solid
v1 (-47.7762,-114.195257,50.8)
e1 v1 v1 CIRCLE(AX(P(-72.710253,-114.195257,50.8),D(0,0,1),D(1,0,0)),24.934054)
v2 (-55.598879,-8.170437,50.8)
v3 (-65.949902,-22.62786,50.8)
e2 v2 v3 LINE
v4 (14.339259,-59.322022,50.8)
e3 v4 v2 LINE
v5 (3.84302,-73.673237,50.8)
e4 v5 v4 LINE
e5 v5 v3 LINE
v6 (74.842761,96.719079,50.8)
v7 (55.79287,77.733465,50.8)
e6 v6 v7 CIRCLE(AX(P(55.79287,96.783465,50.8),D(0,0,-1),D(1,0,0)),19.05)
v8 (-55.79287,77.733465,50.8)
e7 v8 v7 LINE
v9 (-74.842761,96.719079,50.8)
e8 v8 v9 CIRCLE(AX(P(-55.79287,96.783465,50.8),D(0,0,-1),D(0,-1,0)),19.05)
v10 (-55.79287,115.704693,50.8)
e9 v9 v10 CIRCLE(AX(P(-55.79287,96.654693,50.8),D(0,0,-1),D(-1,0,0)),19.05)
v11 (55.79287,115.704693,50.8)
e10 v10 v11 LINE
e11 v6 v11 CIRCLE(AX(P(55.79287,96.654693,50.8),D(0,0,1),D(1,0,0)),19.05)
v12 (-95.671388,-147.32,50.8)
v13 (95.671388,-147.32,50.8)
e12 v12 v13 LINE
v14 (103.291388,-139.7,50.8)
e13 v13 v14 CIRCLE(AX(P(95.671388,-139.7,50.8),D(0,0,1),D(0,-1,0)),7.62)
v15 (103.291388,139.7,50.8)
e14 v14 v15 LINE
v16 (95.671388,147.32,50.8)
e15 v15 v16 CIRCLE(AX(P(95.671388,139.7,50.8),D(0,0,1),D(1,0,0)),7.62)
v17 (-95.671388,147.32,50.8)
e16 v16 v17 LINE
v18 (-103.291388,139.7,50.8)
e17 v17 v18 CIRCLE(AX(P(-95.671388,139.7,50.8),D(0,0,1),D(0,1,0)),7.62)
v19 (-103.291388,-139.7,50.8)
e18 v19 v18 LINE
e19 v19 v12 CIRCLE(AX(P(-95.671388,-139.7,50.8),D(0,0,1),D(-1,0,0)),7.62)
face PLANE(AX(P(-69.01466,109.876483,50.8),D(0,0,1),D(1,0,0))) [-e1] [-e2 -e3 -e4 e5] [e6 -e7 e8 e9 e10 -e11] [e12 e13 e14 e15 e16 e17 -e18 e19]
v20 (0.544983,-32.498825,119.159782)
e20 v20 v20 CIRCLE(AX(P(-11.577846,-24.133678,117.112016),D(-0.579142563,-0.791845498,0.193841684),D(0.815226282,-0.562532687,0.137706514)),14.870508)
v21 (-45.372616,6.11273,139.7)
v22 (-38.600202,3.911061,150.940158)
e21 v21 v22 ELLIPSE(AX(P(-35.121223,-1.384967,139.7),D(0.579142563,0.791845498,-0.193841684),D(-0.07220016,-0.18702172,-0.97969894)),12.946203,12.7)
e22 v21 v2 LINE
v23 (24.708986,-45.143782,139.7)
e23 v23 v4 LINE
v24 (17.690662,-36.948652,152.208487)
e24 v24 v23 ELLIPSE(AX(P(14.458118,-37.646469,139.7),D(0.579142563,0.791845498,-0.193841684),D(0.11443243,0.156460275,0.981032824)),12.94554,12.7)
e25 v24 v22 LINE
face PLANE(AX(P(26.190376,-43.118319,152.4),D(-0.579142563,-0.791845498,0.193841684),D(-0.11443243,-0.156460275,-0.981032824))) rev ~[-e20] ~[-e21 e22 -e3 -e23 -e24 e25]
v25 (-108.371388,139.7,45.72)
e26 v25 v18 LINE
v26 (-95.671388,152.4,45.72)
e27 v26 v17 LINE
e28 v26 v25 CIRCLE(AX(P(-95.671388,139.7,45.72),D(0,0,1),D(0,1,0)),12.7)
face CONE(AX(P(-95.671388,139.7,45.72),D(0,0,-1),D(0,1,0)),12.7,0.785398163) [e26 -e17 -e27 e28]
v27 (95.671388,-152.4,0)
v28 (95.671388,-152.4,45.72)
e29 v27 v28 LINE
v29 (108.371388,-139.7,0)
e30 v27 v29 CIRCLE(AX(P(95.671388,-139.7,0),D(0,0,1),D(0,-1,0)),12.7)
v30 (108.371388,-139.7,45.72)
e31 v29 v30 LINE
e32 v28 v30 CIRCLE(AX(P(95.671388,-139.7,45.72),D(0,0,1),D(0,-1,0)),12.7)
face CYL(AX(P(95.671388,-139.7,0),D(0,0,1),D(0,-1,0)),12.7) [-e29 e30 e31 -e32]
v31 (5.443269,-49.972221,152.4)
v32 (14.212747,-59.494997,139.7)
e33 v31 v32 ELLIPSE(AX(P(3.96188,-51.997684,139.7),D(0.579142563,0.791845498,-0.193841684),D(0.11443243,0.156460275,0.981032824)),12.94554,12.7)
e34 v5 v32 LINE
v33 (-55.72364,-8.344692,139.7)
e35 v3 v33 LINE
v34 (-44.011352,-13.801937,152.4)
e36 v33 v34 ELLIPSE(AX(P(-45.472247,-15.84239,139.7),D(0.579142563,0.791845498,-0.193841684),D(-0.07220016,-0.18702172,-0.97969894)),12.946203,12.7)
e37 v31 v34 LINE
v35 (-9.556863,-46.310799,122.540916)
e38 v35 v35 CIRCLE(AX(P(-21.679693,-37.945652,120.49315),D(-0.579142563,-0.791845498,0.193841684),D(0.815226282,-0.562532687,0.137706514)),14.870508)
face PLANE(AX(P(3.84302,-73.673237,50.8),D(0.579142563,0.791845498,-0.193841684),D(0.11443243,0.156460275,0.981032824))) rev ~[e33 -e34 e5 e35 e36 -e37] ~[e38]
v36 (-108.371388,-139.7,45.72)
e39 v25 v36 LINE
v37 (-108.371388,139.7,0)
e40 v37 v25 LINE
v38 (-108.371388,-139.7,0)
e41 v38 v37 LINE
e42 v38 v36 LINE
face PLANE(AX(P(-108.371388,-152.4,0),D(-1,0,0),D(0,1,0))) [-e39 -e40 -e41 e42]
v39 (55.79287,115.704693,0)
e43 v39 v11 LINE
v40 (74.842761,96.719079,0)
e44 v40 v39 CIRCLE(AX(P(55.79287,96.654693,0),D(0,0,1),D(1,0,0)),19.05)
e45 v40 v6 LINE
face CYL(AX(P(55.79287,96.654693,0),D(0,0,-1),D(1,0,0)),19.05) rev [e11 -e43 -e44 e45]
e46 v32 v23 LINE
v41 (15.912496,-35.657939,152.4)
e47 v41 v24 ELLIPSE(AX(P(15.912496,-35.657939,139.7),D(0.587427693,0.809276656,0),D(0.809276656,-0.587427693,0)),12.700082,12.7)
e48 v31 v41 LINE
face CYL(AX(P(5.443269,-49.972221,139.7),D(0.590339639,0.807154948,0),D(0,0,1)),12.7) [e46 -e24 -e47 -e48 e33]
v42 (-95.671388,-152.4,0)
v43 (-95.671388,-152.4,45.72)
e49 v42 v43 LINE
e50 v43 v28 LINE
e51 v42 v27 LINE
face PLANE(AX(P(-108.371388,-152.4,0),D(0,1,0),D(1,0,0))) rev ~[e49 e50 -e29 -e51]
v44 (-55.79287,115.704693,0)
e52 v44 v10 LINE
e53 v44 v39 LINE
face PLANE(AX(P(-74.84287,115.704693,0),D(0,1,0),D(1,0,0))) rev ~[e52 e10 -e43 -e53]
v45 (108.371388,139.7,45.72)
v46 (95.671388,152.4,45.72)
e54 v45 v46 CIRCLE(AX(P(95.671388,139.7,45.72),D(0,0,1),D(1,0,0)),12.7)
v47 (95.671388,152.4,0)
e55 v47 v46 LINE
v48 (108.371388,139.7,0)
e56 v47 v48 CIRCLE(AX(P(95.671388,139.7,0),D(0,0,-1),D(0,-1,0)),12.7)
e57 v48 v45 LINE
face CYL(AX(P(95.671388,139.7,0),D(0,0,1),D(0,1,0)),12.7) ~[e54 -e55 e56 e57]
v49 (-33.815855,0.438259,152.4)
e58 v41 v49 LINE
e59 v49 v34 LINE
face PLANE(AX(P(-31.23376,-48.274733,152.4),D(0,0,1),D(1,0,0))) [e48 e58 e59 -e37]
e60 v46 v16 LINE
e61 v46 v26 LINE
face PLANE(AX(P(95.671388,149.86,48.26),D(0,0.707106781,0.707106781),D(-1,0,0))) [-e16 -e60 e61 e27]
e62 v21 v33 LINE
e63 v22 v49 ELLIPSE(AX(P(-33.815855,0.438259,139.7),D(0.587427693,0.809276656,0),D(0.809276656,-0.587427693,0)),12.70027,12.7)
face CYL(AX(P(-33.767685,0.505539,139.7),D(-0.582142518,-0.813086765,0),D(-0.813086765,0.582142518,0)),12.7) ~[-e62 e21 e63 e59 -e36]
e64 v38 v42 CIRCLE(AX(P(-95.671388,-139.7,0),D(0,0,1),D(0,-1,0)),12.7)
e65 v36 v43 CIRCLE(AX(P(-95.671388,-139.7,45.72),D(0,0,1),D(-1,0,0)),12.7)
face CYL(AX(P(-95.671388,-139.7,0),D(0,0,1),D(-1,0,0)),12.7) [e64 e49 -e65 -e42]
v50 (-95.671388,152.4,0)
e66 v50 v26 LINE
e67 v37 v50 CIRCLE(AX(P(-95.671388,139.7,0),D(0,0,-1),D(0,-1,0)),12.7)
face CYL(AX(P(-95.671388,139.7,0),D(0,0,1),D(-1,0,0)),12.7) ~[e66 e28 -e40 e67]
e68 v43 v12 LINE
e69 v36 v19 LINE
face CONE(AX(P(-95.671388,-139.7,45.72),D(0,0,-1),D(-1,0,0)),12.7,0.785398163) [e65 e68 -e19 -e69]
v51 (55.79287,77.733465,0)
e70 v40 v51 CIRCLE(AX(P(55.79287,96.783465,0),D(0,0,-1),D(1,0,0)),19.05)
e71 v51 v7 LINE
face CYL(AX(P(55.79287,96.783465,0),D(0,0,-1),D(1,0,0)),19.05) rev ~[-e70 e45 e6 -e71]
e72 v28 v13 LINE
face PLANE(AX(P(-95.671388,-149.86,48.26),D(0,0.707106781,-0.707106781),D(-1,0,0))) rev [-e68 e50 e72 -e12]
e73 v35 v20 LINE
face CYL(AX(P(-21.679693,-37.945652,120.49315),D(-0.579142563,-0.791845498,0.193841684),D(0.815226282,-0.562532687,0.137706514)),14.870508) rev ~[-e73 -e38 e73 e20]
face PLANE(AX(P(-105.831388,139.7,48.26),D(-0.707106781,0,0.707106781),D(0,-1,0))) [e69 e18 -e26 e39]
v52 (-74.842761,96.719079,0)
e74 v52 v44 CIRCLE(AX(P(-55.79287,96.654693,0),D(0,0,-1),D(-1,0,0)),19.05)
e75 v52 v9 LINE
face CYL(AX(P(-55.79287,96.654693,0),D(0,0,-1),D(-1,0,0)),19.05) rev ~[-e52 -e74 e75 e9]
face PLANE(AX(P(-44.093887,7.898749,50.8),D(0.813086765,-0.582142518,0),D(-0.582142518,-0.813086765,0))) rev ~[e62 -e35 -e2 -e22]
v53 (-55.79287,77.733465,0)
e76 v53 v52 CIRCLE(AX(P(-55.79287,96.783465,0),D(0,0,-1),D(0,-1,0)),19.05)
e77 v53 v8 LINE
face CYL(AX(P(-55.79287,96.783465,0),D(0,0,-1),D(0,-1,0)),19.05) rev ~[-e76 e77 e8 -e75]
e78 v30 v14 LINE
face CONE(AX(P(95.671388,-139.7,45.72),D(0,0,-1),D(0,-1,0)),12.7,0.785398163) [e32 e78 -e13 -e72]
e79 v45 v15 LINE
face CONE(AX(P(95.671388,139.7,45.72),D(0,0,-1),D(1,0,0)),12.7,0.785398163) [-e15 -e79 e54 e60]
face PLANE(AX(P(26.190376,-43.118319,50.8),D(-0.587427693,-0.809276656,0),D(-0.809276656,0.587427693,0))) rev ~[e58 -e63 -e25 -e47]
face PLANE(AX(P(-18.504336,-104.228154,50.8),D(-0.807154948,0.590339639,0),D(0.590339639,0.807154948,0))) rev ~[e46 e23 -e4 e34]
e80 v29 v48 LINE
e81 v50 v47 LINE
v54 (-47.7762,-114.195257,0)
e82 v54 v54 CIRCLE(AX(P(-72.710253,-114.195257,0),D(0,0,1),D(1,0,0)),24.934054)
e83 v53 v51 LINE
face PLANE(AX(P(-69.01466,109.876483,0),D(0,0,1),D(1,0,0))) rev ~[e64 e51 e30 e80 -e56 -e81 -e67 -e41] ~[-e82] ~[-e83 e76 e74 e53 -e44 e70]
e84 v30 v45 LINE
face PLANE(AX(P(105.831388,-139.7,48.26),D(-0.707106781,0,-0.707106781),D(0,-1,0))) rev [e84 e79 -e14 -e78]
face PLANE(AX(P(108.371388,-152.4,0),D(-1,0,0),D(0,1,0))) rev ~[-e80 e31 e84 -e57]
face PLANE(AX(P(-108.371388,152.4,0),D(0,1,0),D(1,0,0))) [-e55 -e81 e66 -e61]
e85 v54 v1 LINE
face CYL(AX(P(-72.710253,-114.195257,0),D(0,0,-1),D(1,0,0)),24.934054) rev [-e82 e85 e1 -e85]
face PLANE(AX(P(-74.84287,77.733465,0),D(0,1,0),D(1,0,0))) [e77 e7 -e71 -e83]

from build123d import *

# Parameters (mm, degrees)
F0_W        = 216.7427750782
F0_H        = 304.8
F0_R        = 24.9340536108
F0_W_2      = 149.6857404709
F0_H_2      = 37.9712283611
F1_DEPTH    = 50.8
F2_T1_DEPTH = 50.8
F3_R        = 12.7
F4_SIZE     = 5.08
F6_DEPTH    = 101.6
F6_FACE1_W  = 86.0803631253
F6_FACE1_H  = 101.6
F9_DEPTH    = 101.6
F10_R       = 12.7
F11_R       = 14.8705082973
F12_DEPTH   = 25.4


# Not quite as in the source:
# - a fillet or chamfer that OpenCascade refuses, or shapes differently, is made with other operations: its cross-section is extruded or revolved along the edge and cut away or added


with BuildPart() as f1:
    # F0 (on Top) → F1 (new body)
    with BuildSketch(Plane.XY):
        Rectangle(F0_W, F0_H)
        with Locations((-72.7102532983, -114.1952574253)):
            Circle(F0_R, mode=Mode.SUBTRACT)
        with Locations((0, 96.7190787196)):
            Rectangle(F0_W_2, F0_H_2, mode=Mode.SUBTRACT)
    extrude(amount=F1_DEPTH)

    # F2: fillet of radius 19.05 on 4 edges, made by hand

    # F2_s2 → F2_t1 (join)
    with BuildSketch(Plane.XY):
        with BuildLine():
            ThreePointArc((-74.8428702354, 96.6546929002), (-69.263254417, 110.1250770818), (-55.7928702354, 115.7046929002))
            Line((-55.7928702354, 115.7046929002), (-74.8428702354, 115.7046929002))
            Line((-74.8428702354, 115.7046929002), (-74.8428702354, 96.6546929002))
        make_face()
        with BuildLine():
            ThreePointArc((-55.7928702354, 77.7334645391), (-69.263254417, 83.3130803574), (-74.8428702354, 96.7834645391))
            Line((-74.8428702354, 96.7834645391), (-74.8428702354, 77.7334645391))
            Line((-74.8428702354, 77.7334645391), (-55.7928702354, 77.7334645391))
        make_face()
        with BuildLine():
            ThreePointArc((74.8428702354, 96.7834645391), (69.263254417, 83.3130803574), (55.7928702354, 77.7334645391))
            Line((55.7928702354, 77.7334645391), (74.8428702354, 77.7334645391))
            Line((74.8428702354, 77.7334645391), (74.8428702354, 96.7834645391))
        make_face()
        with BuildLine():
            ThreePointArc((74.8428702354, 96.6546929002), (69.263254417, 110.1250770818), (55.7928702354, 115.7046929002))
            Line((55.7928702354, 115.7046929002), (74.8428702354, 115.7046929002))
            Line((74.8428702354, 115.7046929002), (74.8428702354, 96.6546929002))
        make_face()
    extrude(amount=F2_T1_DEPTH)

    # F3
    f3_edges = [f1.edges().sort_by_distance(p)[0] for p in [
        (108.371388, 152.4, 25.4),
        (-108.371388, 152.4, 25.4),
        (-108.371388, -152.4, 25.4),
        (108.371388, -152.4, 25.4),
    ]]
    fillet(f3_edges, radius=F3_R)

    # F4
    f4_edges = [f1.edges().sort_by_distance(p)[0] for p in [
        (0, -152.4, 50.8),
        (108.371388, 0, 50.8),
        (104.651644, -148.680256, 50.8),
        (-108.371388, 0, 50.8),
        (-104.651644, -148.680256, 50.8),
        (-104.651644, 148.680256, 50.8),
        (0, 152.4, 50.8),
        (104.651644, 148.680256, 50.8),
    ]]
    chamfer(f4_edges, length=F4_SIZE)

    # F5 (on face) → F6 (join)
    with BuildSketch(Plane.XY.offset(50.8)):
        Polygon((26.1903759085, -43.1183193231), (-44.0938870282, 7.8987490062), (-88.495139861, -54.1171146365), (-18.5043358385, -104.2281540196), align=None)
    extrude(amount=F6_DEPTH)

    # F7 (on face) + F6_face1 (on face) → F9 (cut)
    with BuildSketch(Plane(origin=(37.6086943592, -27.5063704871, 0), x_dir=(0.590339639, 0.8071549484, 0), z_dir=(0.8071549484, -0.590339639, 0))):
        Polygon((-57.197030481, 50.8), (-37.1219477484, 152.4), (-95.0521132136, 152.4), (-95.0521132136, 50.8), align=None)
        Polygon((-19.3419477484, 50.8), (-19.3419477484, 152.4), (-39.417030481, 50.8), align=None)
    with BuildSketch(Plane(origin=(-53.4997378497, -79.172634328, 101.6), x_dir=(0.8130867655, -0.5821425185, 0), z_dir=(-0.5821425185, -0.8130867655, 0))):
        Rectangle(F6_FACE1_W, F6_FACE1_H)
    extrude(amount=-F9_DEPTH, dir=(0.8071549484, -0.590339639, 0), mode=Mode.SUBTRACT)

    # F10 (call 1 of 2: OpenCascade refuses the feature's edges together)
    f10_edges = [f1.edges().sort_by_distance(p)[0] for p in [
        (20.942257, -50.293927, 152.4),
    ]]
    fillet(f10_edges, radius=F10_R)

    # F10#2 (call 2 of 2)
    f10_2_edges = [f1.edges().sort_by_distance(p)[0] for p in [
        (-49.178316, 0.797255, 152.4),
    ]]
    fillet(f10_2_edges, radius=F10_R)

    # F11 (on face) → F12 (cut)
    with BuildSketch(Plane(origin=(-38.199850732, -52.2295921019, 12.7856660343), x_dir=(0.8152262825, -0.5625326873, 0.1377065143), z_dir=(-0.5791425631, -0.7918454983, 0.1938416841))):
        with Locations((20.26450634, 108.0148071051)):
            Circle(F11_R)
    extrude(amount=-F12_DEPTH, mode=Mode.SUBTRACT)


solid = f1.part
